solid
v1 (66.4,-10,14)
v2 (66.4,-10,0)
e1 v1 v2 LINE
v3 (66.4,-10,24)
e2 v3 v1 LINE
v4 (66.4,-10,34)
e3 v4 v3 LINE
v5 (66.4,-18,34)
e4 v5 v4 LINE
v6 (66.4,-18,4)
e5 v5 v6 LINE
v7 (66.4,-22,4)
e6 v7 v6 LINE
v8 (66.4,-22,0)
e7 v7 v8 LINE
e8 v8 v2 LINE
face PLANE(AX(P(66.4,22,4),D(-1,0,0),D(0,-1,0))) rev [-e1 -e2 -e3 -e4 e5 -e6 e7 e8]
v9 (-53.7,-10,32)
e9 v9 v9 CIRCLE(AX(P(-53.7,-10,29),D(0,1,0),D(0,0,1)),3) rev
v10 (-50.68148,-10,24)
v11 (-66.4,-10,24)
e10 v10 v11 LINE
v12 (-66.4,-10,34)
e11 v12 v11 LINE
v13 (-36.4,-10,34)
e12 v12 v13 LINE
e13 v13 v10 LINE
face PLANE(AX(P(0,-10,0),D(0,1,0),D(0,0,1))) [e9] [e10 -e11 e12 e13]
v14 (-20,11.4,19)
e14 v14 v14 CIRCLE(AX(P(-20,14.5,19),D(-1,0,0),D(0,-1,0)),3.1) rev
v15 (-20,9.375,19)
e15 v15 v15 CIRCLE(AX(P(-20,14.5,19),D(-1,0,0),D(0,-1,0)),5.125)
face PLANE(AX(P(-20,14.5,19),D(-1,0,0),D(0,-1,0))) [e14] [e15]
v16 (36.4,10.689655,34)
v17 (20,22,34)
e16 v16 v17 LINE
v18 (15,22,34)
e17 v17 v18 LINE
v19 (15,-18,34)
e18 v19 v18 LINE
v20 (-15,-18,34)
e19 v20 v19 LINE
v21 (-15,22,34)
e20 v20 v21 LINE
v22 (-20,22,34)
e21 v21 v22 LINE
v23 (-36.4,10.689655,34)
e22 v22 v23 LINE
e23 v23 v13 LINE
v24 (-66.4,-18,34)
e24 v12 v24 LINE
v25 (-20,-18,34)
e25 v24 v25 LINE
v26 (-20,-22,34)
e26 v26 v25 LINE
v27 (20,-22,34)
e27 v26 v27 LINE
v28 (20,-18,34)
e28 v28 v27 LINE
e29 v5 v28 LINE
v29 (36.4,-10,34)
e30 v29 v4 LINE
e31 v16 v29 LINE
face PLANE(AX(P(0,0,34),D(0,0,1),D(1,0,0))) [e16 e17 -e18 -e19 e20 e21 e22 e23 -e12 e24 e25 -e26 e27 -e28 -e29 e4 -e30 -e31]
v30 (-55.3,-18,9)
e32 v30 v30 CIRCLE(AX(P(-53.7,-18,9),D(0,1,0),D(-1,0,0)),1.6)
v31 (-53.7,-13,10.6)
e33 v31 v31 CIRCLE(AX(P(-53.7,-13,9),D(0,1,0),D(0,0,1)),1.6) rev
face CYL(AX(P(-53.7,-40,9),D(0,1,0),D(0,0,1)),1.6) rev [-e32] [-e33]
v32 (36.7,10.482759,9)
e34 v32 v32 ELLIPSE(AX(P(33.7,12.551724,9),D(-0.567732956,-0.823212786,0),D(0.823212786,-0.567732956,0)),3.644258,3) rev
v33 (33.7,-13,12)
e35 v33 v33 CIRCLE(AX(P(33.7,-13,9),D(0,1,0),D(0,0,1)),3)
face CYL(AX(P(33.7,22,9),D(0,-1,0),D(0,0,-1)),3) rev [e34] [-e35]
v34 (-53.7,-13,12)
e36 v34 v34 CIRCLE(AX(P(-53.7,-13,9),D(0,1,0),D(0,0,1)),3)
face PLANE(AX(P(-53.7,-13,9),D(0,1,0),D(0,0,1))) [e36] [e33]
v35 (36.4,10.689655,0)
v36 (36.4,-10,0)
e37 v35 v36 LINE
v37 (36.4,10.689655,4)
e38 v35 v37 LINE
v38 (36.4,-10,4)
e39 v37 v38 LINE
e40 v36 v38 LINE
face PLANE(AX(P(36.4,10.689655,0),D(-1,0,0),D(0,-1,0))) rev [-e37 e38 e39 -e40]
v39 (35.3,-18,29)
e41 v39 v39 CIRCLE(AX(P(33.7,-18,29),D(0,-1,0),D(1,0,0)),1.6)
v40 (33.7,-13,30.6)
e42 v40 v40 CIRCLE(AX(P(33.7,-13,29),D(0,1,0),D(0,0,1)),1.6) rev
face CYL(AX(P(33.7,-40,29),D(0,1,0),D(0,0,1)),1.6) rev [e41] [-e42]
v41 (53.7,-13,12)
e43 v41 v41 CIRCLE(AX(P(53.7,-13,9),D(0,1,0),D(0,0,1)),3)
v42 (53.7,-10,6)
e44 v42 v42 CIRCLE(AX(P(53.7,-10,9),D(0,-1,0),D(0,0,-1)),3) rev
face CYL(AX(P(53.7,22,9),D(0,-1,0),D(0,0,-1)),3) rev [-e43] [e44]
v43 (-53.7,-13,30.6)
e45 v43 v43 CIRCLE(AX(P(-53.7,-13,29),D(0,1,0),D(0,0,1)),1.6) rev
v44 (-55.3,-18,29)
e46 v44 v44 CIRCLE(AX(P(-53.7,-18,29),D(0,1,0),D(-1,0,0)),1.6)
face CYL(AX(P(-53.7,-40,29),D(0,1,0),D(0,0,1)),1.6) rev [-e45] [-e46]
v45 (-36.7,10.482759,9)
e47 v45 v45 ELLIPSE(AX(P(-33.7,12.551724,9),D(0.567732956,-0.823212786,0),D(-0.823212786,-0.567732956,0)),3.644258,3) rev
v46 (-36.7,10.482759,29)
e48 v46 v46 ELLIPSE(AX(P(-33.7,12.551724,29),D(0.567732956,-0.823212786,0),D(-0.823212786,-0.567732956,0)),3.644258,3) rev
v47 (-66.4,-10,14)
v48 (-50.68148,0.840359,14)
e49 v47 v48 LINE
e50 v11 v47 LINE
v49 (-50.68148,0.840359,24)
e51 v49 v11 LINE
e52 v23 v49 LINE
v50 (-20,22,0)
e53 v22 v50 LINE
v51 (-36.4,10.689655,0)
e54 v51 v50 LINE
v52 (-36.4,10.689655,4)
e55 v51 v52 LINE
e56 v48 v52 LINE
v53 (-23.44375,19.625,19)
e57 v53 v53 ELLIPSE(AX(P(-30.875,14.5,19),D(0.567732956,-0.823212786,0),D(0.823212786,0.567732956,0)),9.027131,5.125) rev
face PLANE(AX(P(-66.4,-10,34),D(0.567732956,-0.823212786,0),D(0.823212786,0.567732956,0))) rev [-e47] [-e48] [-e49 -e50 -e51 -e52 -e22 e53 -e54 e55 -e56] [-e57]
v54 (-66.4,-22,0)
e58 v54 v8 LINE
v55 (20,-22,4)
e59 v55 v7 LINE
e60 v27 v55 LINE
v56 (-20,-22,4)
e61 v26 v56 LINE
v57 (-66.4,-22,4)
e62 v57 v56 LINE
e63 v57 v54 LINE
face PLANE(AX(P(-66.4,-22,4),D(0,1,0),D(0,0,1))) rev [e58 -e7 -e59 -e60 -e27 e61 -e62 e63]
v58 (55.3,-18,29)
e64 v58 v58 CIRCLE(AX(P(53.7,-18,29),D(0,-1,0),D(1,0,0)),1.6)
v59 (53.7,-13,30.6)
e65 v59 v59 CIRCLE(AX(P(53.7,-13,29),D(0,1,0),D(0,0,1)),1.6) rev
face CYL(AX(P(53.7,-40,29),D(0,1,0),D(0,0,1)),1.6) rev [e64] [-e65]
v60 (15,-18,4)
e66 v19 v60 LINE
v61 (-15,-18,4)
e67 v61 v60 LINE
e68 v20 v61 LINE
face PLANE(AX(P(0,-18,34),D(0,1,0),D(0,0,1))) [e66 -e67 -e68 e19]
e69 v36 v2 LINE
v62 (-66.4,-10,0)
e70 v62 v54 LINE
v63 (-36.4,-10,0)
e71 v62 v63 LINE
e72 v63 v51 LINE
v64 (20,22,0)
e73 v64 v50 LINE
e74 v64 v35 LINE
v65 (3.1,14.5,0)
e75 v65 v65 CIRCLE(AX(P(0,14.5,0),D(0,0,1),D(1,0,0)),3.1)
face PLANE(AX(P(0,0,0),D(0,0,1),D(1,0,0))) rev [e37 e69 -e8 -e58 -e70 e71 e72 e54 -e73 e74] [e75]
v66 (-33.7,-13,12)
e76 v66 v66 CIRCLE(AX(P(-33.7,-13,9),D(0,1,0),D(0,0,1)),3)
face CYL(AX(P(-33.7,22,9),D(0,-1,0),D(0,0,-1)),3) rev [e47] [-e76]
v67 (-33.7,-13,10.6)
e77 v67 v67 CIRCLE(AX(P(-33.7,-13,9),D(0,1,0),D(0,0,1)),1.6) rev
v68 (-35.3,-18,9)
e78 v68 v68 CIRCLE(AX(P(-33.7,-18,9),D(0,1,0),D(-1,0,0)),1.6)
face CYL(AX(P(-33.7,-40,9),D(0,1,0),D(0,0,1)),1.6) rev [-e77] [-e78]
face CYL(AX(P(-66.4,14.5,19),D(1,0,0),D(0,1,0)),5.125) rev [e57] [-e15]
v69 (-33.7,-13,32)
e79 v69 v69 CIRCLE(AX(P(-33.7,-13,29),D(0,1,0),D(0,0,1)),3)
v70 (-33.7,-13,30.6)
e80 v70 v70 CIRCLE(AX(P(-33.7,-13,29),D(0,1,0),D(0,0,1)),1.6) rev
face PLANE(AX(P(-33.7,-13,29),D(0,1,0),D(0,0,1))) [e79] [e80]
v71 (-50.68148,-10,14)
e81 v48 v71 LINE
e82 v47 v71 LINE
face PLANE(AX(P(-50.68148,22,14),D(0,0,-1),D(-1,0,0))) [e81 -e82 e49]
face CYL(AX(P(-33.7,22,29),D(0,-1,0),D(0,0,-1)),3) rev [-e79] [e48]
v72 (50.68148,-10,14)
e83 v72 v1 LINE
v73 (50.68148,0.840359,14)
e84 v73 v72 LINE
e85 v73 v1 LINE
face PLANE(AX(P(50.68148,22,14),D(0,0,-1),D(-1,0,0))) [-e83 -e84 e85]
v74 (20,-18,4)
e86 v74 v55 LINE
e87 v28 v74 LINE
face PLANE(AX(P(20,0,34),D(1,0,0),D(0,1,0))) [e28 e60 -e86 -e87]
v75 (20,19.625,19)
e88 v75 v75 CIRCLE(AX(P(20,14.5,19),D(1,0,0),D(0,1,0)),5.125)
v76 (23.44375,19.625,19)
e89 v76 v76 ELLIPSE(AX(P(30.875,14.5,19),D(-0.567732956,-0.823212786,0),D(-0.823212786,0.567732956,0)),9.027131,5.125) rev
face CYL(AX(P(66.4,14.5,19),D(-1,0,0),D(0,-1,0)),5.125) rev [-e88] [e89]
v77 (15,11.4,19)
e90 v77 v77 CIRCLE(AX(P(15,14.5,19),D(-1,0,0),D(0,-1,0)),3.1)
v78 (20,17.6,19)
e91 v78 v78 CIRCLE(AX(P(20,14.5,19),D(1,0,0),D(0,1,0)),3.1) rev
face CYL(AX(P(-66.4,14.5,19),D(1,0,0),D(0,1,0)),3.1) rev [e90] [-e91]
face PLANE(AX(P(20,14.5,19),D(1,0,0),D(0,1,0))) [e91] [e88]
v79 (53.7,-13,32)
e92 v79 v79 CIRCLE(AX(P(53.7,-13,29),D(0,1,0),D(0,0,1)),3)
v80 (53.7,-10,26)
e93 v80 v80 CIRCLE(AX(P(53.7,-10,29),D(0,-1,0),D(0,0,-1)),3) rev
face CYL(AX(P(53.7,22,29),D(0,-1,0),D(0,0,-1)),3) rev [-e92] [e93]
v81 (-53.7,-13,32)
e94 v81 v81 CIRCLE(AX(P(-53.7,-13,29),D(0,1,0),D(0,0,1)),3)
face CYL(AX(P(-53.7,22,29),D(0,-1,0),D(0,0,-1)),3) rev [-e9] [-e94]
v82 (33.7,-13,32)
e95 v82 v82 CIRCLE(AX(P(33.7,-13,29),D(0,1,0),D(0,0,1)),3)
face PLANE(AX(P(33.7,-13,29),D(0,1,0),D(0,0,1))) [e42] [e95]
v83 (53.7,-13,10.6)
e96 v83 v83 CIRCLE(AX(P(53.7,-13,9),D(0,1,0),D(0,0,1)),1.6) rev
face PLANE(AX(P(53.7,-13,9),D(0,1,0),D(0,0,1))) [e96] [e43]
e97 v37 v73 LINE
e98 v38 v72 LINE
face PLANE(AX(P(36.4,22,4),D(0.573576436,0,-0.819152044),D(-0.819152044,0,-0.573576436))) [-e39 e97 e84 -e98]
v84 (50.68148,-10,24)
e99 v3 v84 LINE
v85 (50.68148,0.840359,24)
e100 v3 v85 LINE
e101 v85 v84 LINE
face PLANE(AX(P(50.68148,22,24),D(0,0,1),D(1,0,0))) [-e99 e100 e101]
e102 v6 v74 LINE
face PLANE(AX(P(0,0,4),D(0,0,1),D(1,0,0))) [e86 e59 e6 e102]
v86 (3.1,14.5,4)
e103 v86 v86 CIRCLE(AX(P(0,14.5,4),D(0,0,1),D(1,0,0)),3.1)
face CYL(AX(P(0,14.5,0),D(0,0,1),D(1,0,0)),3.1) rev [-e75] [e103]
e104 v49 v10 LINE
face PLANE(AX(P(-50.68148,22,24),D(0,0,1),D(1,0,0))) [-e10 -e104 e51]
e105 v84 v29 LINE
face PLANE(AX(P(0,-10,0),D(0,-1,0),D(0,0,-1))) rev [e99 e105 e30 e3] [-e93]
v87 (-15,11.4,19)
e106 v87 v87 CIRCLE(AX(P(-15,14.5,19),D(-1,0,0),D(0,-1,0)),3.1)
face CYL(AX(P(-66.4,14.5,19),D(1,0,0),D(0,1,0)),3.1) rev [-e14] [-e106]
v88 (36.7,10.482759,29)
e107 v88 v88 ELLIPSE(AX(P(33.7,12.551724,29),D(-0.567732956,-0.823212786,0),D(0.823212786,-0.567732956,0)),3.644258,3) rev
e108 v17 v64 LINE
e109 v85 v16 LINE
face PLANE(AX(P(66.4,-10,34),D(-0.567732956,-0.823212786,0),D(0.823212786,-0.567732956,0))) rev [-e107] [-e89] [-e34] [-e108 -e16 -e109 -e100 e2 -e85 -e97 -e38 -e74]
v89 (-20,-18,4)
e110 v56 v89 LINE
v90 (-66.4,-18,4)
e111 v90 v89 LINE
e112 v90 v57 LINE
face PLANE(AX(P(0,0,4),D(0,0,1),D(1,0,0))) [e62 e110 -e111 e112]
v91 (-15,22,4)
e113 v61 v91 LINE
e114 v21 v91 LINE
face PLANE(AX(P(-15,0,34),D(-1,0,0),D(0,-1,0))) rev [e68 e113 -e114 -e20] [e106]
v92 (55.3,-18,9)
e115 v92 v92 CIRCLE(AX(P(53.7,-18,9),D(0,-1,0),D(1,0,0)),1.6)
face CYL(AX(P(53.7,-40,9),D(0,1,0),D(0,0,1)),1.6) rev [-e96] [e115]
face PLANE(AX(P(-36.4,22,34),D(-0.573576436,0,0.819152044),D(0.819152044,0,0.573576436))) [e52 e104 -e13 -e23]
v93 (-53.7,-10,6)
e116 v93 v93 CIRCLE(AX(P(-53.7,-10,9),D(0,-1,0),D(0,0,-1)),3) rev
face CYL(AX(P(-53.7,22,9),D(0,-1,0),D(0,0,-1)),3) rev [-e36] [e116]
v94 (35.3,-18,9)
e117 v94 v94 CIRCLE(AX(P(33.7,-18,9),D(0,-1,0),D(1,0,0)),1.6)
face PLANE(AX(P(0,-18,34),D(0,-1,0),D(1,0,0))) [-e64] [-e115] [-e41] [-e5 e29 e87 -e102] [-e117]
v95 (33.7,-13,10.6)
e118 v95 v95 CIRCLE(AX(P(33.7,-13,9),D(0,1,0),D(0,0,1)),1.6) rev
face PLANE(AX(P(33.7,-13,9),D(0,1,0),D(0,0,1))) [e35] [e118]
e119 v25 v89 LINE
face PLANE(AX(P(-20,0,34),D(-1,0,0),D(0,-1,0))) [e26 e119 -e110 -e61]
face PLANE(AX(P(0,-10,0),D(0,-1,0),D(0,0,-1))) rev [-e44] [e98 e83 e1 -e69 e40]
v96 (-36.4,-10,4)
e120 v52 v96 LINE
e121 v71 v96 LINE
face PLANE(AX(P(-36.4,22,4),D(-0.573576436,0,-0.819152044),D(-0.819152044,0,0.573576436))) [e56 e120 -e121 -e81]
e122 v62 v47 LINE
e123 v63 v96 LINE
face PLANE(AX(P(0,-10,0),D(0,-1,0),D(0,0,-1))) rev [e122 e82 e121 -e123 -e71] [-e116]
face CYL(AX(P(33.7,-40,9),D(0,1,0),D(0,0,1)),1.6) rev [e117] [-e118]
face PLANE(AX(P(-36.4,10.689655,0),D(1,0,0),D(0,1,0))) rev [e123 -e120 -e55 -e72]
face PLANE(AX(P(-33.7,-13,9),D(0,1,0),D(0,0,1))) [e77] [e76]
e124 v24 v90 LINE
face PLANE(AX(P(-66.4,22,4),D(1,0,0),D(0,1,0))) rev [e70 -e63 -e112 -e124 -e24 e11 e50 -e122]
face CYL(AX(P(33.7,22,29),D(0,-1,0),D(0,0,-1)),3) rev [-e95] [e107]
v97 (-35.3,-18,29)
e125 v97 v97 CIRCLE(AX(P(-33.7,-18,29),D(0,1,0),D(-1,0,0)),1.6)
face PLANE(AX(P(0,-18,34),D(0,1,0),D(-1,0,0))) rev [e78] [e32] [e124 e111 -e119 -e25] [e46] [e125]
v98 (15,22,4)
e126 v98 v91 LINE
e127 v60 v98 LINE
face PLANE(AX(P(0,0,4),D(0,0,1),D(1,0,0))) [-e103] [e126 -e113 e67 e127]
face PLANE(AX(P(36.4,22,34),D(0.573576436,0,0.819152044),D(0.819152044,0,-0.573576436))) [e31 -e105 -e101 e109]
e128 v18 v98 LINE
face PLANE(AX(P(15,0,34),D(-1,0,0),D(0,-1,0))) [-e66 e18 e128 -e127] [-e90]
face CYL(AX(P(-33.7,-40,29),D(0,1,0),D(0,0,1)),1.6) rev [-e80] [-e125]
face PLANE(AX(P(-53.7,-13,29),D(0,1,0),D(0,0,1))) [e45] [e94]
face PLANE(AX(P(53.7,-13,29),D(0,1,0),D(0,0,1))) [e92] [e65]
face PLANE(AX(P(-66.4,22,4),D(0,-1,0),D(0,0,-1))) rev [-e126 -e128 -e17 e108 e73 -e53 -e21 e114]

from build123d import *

# Parameters (mm, degrees)
SKETCH1_W               = 132.8
SKETCH1_H               = 44
BOSS_EXTRUDE1_DEPTH     = 4
BOSS_EXTRUDE2_DEPTH     = 30
BOSS_EXTRUDE3_DEPTH     = 15
CUT_EXTRUDE3_DEPTH      = 91.917325082
CUT_EXTRUDE3_DEPTH_BACK = 91.917325082
SKETCH6_R               = 3.1
SKETCH8_R               = 5.125
CUT_EXTRUDE5_DEPTH      = 96.419914064
SKETCH9_R               = 5.125
CUT_EXTRUDE6_DEPTH      = 96.419914064
CUT_EXTRUDE4_DEPTH      = 82.172409106
SKETCH3_R               = 1.6
CUT_EXTRUDE1_DEPTH      = 30
CUT_EXTRUDE2_DEPTH      = 82.172409106
CUT_EXTRUDE2_DEPTH_BACK = 3
SKETCH4_R               = 3
CUT_EXTRUDE7_DEPTH      = 77.11149716
SKETCH11_R              = 3.1
CUT_EXTRUDE8_DEPTH      = 77.11149716


with BuildPart() as part:
    # Sketch1 → Boss-Extrude1 (new body)
    with BuildSketch(Plane.XY):
        Rectangle(SKETCH1_W, SKETCH1_H)
    extrude(amount=BOSS_EXTRUDE1_DEPTH)

    # Sketch2 → Boss-Extrude2 (add)
    with BuildSketch(Plane.XY.offset(4)):
        Polygon((15, -18), (-15, -18), (-15, 22), (-20, 22), (-20, -10), (-66.4, -10), (-66.4, -18), (-20, -18), (-20, -22), (20, -22), (20, -18), (66.4, -18), (66.4, -10), (20, -10), (20, 22), (15, 22), align=None)
    extrude(amount=BOSS_EXTRUDE2_DEPTH)

    # Sketch5 → Boss-Extrude3 (add, symmetric)
    with BuildSketch(Plane.XY.offset(19)):
        Polygon((20, -10), (66.4, -10), (20, 22), align=None)
        Polygon((-20, 22), (-20, -10), (-66.4, -10), align=None)
    extrude(amount=BOSS_EXTRUDE3_DEPTH, both=True)

    # Sketch6 → Cut-Extrude3 (cut, two sides: drawn at the far end of the back side and taken through both)
    with BuildSketch(Plane(origin=(-15, 0, 0), x_dir=(0, 0, -1), z_dir=(1, 0, 0)).offset(-CUT_EXTRUDE3_DEPTH_BACK)):
        with Locations((-19, 14.5)):
            Circle(SKETCH6_R)
    extrude(amount=CUT_EXTRUDE3_DEPTH + CUT_EXTRUDE3_DEPTH_BACK, mode=Mode.SUBTRACT)

    # Sketch8 → Cut-Extrude5 (cut, through all)
    with BuildSketch(Plane(origin=(20, 0, 0), x_dir=(0, 0, -1), z_dir=(1, 0, 0))):
        with Locations((-19, 14.5)):
            Circle(SKETCH8_R)
    extrude(amount=CUT_EXTRUDE5_DEPTH, mode=Mode.SUBTRACT)

    # Sketch9 → Cut-Extrude6 (cut, through all)
    with BuildSketch(Plane.ZY.offset(20)):
        with Locations((19, 14.5)):
            Circle(SKETCH9_R)
    extrude(amount=CUT_EXTRUDE6_DEPTH, mode=Mode.SUBTRACT)

    # Sketch7 → Cut-Extrude4 (cut, through all)
    with BuildSketch(Plane(origin=(0, -10, 0), x_dir=(1, 0, 0), z_dir=(0, 1, 0))):
        Polygon((50.681480067, -14), (66.4, -14), (66.4, -4), (36.4, -4), align=None)
        Polygon((66.4, -34), (66.4, -24), (50.681480067, -24), (36.4, -34), align=None)
        Polygon((-66.4, -4), (-66.4, -14), (-50.681480067, -14), (-36.4, -4), align=None)
        Polygon((-50.681480067, -24), (-66.4, -24), (-66.4, -34), (-36.4, -34), align=None)
    extrude(amount=CUT_EXTRUDE4_DEPTH, mode=Mode.SUBTRACT)

    # Sketch3 → Cut-Extrude1 (cut)
    with BuildSketch(Plane(origin=(0, -10, 0), x_dir=(1, 0, 0), z_dir=(0, 1, 0))):
        with Locations((-53.7, -9)):
            Circle(SKETCH3_R)
        with Locations((-33.7, -29)):
            Circle(SKETCH3_R)
        with Locations((-33.7, -9)):
            Circle(SKETCH3_R)
        with Locations((-53.7, -29)):
            Circle(SKETCH3_R)
        with Locations((33.7, -9)):
            Circle(SKETCH3_R)
        with Locations((33.7, -29)):
            Circle(SKETCH3_R)
        with Locations((53.7, -29)):
            Circle(SKETCH3_R)
        with Locations((53.7, -9)):
            Circle(SKETCH3_R)
    extrude(amount=-CUT_EXTRUDE1_DEPTH, mode=Mode.SUBTRACT)

    # Sketch4 → Cut-Extrude2 (cut, two sides: drawn at the far end of the back side and taken through both)
    with BuildSketch(Plane(origin=(0, -10, 0), x_dir=(1, 0, 0), z_dir=(0, 1, 0)).offset(-CUT_EXTRUDE2_DEPTH_BACK)):
        with Locations((-53.7, -9)):
            Circle(SKETCH4_R)
        with Locations((-33.7, -9)):
            Circle(SKETCH4_R)
        with Locations((-33.7, -29)):
            Circle(SKETCH4_R)
        with Locations((-53.7, -29)):
            Circle(SKETCH4_R)
        with Locations((33.7, -9)):
            Circle(SKETCH4_R)
        with Locations((53.7, -9)):
            Circle(SKETCH4_R)
        with Locations((53.7, -29)):
            Circle(SKETCH4_R)
        with Locations((33.7, -29)):
            Circle(SKETCH4_R)
    extrude(amount=CUT_EXTRUDE2_DEPTH + CUT_EXTRUDE2_DEPTH_BACK, mode=Mode.SUBTRACT)

    # Sketch10 → Cut-Extrude7 (cut, through all)
    with BuildSketch(Plane.XY.offset(4)):
        Polygon((20, 22), (36.4, 10.689655172), (36.4, -10), (66.4, -10), (66.4, 22), align=None)
        Polygon((-66.4, 22), (-20, 22), (-36.4, 10.689655172), (-36.4, -10), (-66.4, -10), align=None)
    extrude(amount=-CUT_EXTRUDE7_DEPTH, mode=Mode.SUBTRACT)

    # Sketch11 → Cut-Extrude8 (cut, through all)
    with BuildSketch(Plane.XY.offset(4)):
        with Locations((0, 14.5)):
            Circle(SKETCH11_R)
    extrude(amount=-CUT_EXTRUDE8_DEPTH, mode=Mode.SUBTRACT)


solid = part.part
